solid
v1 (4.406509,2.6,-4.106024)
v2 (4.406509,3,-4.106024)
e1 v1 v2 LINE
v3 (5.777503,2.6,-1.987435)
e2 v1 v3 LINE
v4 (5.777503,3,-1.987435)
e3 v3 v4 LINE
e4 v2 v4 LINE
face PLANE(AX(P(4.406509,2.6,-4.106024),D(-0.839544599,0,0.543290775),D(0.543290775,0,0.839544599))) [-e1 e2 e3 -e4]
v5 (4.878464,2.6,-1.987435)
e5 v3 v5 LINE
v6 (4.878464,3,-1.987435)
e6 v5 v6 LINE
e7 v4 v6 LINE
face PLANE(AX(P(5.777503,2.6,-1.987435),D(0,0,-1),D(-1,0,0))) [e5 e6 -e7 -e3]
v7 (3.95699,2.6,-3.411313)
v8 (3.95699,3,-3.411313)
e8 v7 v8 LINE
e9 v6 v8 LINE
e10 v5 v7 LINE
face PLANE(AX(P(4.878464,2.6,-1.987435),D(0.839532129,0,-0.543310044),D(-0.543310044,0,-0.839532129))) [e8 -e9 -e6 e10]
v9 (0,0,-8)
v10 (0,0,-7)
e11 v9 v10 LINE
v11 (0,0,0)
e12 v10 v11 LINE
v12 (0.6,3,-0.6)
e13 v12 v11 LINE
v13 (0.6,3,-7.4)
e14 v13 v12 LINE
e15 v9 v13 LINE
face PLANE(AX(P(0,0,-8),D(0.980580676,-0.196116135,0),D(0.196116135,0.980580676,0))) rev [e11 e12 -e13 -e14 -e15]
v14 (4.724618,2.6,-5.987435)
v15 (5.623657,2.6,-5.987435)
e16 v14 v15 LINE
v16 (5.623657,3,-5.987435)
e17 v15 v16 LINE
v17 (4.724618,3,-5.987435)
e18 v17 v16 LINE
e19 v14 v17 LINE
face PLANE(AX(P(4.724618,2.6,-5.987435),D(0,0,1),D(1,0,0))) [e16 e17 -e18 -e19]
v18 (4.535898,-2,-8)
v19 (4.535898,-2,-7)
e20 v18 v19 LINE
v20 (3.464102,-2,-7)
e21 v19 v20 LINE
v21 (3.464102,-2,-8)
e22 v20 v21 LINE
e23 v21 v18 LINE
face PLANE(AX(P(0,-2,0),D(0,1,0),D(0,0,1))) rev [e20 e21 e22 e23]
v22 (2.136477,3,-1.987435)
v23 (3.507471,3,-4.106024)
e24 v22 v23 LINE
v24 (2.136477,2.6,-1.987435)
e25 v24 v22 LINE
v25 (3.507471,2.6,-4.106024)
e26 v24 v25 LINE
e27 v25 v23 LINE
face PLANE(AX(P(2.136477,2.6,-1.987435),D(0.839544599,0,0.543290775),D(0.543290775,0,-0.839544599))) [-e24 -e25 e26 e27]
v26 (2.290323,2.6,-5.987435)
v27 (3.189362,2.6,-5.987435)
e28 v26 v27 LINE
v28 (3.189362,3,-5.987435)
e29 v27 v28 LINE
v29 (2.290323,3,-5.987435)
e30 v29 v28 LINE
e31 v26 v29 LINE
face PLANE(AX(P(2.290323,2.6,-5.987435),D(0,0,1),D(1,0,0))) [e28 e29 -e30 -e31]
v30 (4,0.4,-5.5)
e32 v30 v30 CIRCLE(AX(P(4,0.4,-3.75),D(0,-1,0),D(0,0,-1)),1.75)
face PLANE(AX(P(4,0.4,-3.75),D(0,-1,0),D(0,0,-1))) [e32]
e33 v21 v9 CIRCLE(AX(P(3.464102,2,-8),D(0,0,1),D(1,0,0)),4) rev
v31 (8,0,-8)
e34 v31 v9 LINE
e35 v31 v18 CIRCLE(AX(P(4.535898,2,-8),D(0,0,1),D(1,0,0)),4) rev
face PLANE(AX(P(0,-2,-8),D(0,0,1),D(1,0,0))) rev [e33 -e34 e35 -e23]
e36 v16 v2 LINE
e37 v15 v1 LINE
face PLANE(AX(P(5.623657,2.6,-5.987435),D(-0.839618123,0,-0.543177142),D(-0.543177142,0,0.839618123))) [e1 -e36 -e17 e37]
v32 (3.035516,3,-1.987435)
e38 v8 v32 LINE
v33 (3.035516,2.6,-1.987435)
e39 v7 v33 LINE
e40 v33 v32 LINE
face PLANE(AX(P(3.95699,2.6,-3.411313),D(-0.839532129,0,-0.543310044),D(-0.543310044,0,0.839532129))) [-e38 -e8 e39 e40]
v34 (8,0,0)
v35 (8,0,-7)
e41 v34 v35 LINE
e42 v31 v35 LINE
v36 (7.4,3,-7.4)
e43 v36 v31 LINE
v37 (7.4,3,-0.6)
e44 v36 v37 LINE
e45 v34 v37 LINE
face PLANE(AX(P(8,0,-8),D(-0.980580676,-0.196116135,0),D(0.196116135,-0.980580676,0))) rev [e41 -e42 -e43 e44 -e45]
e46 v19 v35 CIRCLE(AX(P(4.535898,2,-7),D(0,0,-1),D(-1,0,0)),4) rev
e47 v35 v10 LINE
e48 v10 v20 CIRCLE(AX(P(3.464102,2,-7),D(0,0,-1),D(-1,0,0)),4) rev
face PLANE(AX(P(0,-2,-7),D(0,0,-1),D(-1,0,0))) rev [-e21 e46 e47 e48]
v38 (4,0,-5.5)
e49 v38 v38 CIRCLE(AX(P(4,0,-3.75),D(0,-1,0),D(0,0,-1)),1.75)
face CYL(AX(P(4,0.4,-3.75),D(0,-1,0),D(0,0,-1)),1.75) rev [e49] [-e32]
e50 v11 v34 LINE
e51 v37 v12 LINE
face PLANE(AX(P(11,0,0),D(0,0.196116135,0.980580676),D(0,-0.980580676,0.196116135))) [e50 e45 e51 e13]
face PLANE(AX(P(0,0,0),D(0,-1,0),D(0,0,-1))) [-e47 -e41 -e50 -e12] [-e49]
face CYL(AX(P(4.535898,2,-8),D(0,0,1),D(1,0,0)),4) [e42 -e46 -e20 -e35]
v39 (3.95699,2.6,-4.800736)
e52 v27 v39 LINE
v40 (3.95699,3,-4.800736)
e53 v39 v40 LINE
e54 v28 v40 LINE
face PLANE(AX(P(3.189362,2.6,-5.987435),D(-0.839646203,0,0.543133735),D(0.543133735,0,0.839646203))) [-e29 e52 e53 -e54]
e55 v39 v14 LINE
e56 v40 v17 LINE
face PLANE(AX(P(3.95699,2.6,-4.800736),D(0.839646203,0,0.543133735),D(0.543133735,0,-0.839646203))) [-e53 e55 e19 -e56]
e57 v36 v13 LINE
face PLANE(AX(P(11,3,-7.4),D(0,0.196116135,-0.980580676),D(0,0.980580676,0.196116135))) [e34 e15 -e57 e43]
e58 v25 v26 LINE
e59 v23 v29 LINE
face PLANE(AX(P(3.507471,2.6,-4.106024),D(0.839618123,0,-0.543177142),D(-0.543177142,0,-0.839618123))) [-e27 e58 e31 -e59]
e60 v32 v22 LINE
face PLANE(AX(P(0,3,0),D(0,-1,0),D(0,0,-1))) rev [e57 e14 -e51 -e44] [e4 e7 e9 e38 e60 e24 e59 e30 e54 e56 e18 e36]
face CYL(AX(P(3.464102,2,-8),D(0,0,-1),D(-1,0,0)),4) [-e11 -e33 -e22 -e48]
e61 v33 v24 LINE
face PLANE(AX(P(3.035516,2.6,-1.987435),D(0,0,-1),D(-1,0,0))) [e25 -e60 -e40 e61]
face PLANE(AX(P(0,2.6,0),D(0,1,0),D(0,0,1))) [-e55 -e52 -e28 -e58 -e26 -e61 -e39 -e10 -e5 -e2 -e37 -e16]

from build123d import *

# Parameters (mm, degrees)
SKETCH1_W               = 8
SKETCH1_H               = 8
BOSS_EXTRUDE1_DEPTH     = 3
CUT_EXTRUDE1_DEPTH      = 12.704699911
CUT_EXTRUDE1_DEPTH_BACK = 12.704699911
CUT_EXTRUDE2_DEPTH      = 11
SKETCH4_R               = 1.75
CUT_EXTRUDE3_DEPTH      = 0.4
SKETCH5_W               = 8
SKETCH5_H               = 1
BOSS_EXTRUDE2_DEPTH     = 2
FILLET1_R               = 4
CUT_EXTRUDE4_DEPTH      = 0.4


with BuildPart() as part:
    # Sketch1 → Boss-Extrude1 (new body)
    with BuildSketch(Plane(origin=(0, 0, 0), x_dir=(1, 0, 0), z_dir=(0, 1, 0))):
        with Locations((4, 4)):
            Rectangle(SKETCH1_W, SKETCH1_H)
    extrude(amount=BOSS_EXTRUDE1_DEPTH)

    # Sketch2 → Cut-Extrude1 (cut, two sides: drawn at the far end of the back side and taken through both)
    with BuildSketch(Plane.XY.offset(-CUT_EXTRUDE1_DEPTH_BACK)):
        Polygon((0, 0), (0.6, 3), (0, 3), align=None)
        Polygon((8, 0), (7.4, 3), (8, 3), align=None)
    extrude(amount=CUT_EXTRUDE1_DEPTH + CUT_EXTRUDE1_DEPTH_BACK, mode=Mode.SUBTRACT)

    # Sketch3 → Cut-Extrude2 (cut)
    with BuildSketch(Plane(origin=(0, 0, 0), x_dir=(0, 0, -1), z_dir=(1, 0, 0))):
        Polygon((0, 0), (0.6, 3), (0, 3), align=None)
        Polygon((8, 3), (7.4, 3), (8, 0), align=None)
    extrude(amount=CUT_EXTRUDE2_DEPTH, mode=Mode.SUBTRACT)

    # Sketch4 → Cut-Extrude3 (cut)
    with BuildSketch(Plane.XZ):
        with Locations(Location((4, -3.75, 0), (0, 0, 270))):
            Circle(SKETCH4_R)
    extrude(amount=-CUT_EXTRUDE3_DEPTH, mode=Mode.SUBTRACT)

    # Sketch5 → Boss-Extrude2 (add)
    with BuildSketch(Plane.XZ):
        with Locations((4, -7.5)):
            Rectangle(SKETCH5_W, SKETCH5_H)
    extrude(amount=BOSS_EXTRUDE2_DEPTH)

    # Fillet1
    # the kernel refuses this fillet: 4 mm, written as the material it takes off along each edge
    with BuildSketch(Plane(origin=(8, -2, -16.660254038), x_dir=(0, 1, 0), z_dir=(0, 0, 1)), Plane(origin=(0, -2, 1.660254038), x_dir=(0, 1, 0), z_dir=(0, 0, -1))) as fillet1_piece_1:
        with BuildLine():
            CenterArc((4, 3.464101615), FILLET1_R, 180, 60)
            Line((0, 3.464101615), (-0.08, 3.464101615))
            Line((-0.08, 3.464101615), (-0.08, 0))
            Line((-0.08, 0), (0, -0.08))
            ThreePointArc((0, -0.08), (1, -0.08), (1.96, -0.069282032))
            Line((1.96, -0.069282032), (2, 0))
        make_face()
    extrude(amount=18.320508076, mode=Mode.SUBTRACT)

    # Sketch6 → Cut-Extrude4 (cut)
    with BuildSketch(Plane(origin=(0, 3, 0), x_dir=(1, 0, 0), z_dir=(0, 1, 0))):
        Polygon((2.136477101, 1.987434605), (3.507470691, 4.106024349), (2.290323255, 5.987434605), (3.189361717, 5.987434605), (3.956989922, 4.800735887), (4.724618127, 5.987434605), (5.623656589, 5.987434605), (4.406509153, 4.106024349), (5.777502742, 1.987434605), (4.878464281, 1.987434605), (3.956989922, 3.41131281), (3.035515563, 1.987434605), align=None)
    extrude(amount=-CUT_EXTRUDE4_DEPTH, mode=Mode.SUBTRACT)


solid = part.part
